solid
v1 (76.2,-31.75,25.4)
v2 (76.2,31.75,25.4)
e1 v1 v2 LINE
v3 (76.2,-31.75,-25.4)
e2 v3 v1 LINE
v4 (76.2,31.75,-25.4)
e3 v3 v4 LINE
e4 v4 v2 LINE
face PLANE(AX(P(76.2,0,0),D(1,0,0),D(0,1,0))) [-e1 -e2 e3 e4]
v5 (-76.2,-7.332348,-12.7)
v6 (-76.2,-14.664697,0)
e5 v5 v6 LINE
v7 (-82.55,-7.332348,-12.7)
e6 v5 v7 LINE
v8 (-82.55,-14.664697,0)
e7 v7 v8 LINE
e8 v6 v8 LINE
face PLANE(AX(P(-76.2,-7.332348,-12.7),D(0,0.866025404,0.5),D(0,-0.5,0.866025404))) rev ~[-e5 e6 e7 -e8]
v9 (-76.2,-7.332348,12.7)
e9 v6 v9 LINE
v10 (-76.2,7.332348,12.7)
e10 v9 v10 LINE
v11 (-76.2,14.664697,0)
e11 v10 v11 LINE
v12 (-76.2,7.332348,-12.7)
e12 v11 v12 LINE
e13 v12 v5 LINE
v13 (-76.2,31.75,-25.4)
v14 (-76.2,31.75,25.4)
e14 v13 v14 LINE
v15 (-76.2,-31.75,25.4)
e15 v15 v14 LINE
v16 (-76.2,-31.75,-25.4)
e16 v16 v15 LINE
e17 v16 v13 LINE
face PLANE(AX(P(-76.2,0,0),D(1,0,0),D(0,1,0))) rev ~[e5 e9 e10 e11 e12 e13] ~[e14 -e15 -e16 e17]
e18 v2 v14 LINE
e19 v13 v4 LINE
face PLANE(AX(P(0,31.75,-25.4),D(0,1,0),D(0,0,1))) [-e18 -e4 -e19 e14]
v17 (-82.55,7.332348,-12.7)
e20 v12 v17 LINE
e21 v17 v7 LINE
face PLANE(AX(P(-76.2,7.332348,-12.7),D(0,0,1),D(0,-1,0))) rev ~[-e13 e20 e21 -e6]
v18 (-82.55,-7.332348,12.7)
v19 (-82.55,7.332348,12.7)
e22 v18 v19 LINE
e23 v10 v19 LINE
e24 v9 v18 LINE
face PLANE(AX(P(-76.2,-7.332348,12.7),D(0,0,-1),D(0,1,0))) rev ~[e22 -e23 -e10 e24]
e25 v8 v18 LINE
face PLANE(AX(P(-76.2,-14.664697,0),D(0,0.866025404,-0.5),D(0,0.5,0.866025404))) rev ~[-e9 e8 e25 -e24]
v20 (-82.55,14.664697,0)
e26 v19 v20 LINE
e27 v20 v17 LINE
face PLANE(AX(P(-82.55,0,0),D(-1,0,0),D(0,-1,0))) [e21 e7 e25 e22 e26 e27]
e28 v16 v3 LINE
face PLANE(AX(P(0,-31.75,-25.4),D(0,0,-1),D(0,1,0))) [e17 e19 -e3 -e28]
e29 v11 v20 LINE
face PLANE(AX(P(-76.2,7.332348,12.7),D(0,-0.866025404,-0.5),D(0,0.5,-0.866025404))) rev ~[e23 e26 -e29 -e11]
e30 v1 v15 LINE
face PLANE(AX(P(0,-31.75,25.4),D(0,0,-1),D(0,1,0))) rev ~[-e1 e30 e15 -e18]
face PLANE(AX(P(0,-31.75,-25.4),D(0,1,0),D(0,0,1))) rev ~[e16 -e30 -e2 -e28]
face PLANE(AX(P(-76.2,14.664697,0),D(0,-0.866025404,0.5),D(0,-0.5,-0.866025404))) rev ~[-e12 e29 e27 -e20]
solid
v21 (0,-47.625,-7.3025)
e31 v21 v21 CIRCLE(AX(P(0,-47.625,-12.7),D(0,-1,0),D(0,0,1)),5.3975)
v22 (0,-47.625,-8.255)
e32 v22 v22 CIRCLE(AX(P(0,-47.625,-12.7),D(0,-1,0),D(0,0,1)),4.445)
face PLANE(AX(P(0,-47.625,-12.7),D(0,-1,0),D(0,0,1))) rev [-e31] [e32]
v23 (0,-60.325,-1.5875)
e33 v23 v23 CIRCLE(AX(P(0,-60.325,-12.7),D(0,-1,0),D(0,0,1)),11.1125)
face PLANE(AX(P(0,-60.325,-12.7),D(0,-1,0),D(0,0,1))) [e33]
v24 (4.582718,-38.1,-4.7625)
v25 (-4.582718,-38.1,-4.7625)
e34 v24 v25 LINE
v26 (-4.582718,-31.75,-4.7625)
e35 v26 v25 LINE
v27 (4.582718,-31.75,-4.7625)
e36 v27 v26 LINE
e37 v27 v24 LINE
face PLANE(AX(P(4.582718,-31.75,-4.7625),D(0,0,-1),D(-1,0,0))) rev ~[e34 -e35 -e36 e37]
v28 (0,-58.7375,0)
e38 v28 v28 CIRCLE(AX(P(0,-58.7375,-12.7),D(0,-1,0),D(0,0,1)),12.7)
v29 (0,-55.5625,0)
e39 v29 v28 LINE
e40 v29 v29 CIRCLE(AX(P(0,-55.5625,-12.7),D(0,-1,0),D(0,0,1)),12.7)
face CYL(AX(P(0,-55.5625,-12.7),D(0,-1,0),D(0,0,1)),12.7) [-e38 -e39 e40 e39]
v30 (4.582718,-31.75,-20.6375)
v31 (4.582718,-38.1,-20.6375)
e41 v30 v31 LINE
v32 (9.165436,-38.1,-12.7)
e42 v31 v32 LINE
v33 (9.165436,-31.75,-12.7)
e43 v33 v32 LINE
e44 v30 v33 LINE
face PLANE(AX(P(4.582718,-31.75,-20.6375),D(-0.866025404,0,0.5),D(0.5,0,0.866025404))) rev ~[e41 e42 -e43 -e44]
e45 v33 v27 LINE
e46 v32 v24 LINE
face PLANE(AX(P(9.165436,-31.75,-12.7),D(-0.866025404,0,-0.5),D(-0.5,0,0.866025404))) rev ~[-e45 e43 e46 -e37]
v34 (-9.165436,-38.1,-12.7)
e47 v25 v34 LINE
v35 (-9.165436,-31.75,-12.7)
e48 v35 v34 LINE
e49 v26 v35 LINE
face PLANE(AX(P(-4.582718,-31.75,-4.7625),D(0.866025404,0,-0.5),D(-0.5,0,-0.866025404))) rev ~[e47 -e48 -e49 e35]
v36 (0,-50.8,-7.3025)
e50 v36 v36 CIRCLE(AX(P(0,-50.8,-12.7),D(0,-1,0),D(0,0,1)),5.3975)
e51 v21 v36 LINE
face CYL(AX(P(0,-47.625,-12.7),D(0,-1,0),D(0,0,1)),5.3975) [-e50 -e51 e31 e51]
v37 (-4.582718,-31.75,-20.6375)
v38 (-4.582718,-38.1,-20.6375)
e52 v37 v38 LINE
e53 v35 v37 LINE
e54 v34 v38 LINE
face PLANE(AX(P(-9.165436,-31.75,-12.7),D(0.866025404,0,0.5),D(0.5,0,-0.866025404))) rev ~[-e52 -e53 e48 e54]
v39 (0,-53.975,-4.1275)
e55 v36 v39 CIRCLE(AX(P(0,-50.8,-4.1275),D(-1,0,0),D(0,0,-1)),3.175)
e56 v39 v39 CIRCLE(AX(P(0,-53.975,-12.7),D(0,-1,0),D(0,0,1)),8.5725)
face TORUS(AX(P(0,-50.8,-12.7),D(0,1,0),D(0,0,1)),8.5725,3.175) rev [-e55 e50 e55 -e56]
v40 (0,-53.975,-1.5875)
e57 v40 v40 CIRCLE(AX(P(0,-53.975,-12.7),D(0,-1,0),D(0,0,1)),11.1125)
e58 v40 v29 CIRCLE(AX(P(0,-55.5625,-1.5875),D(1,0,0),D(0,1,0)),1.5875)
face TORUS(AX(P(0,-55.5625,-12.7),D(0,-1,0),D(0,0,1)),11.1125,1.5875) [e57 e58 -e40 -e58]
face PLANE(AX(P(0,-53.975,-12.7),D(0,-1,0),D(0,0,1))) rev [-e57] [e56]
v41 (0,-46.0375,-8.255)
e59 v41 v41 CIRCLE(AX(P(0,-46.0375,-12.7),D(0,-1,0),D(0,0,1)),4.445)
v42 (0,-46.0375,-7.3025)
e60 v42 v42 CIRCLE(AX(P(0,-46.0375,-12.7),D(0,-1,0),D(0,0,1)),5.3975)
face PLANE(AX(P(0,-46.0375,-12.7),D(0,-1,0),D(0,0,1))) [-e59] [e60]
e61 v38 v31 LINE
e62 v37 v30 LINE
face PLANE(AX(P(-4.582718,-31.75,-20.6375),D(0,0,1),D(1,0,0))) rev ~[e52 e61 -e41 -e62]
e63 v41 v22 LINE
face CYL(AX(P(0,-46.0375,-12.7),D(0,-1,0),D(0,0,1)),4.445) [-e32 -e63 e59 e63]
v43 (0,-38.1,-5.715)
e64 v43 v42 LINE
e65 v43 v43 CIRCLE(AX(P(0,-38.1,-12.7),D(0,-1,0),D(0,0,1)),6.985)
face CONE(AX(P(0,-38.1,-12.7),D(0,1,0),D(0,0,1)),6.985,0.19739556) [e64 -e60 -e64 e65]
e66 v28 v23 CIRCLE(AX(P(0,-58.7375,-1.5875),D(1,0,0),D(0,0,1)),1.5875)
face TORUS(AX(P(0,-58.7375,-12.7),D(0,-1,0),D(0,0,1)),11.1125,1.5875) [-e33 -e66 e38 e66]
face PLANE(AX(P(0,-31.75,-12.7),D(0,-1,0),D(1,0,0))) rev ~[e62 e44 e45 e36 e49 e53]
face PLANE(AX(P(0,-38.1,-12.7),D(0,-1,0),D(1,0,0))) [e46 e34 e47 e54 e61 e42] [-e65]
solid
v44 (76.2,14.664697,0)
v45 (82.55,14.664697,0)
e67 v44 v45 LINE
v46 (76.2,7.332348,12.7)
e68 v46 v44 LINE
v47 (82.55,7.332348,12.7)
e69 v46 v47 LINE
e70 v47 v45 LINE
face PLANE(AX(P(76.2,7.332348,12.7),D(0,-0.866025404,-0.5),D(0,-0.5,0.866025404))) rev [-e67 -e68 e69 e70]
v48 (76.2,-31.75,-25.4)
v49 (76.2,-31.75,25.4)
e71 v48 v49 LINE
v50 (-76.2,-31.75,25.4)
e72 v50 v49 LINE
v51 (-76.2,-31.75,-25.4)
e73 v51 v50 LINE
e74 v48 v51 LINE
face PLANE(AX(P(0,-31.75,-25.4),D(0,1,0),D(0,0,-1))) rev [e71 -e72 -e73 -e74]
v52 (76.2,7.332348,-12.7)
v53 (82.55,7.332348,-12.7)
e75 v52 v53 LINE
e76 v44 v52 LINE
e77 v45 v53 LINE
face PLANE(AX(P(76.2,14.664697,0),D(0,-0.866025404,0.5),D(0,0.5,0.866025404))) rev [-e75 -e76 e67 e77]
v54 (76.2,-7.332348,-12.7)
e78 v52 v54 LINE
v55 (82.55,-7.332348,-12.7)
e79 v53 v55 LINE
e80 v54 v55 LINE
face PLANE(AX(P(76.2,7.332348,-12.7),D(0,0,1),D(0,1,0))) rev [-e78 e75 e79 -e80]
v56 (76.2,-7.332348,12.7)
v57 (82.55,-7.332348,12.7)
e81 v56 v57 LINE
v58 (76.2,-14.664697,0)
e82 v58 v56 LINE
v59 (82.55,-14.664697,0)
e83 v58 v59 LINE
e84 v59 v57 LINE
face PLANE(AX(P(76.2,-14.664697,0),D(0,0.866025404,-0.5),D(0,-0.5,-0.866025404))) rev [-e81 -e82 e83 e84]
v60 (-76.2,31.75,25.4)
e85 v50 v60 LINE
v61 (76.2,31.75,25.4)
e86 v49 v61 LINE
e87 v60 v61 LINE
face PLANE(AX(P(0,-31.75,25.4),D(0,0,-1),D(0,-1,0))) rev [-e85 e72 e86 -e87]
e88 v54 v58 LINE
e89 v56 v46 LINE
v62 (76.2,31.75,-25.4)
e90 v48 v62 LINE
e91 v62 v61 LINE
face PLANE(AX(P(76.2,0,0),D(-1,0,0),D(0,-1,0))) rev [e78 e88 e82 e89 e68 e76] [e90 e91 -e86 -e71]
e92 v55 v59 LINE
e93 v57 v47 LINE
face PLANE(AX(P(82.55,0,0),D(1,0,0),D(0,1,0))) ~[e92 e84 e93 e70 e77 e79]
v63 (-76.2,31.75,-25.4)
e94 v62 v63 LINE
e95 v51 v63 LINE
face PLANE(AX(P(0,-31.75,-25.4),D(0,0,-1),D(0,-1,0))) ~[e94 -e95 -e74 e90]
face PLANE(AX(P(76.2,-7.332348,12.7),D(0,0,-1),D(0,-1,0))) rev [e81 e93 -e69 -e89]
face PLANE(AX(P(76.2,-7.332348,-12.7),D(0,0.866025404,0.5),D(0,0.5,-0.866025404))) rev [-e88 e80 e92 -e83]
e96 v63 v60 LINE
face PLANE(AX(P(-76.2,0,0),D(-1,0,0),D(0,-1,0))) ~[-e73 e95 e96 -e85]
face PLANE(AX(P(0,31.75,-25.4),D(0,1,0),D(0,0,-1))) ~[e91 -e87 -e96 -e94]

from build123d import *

# Parameters (mm, degrees)
F0_W          = 63.5
F0_H          = 50.8
F1_DEPTH      = 76.2
F1_DEPTH_BACK = 76.2
F3_DEPTH      = 6.35
F8_DEPTH      = 6.35


# Not quite as in the source:
# - a feature names something its author has since deleted; it is built from what else it names
# - the program builds the solid bodies; features that only make, move or delete a surface that nothing else refers to are left out


with BuildPart() as f1:
    # F0 (on Right) → F1 (new body, two sides)
    with BuildSketch(Plane.YZ) as f1_sk:
        Rectangle(F0_W, F0_H)
    extrude(amount=F1_DEPTH)
    extrude(f1_sk.sketch, amount=-F1_DEPTH_BACK)

    # F2 (on face) → F3 (join)
    with BuildSketch(Plane(origin=(-76.2, 0, 0), x_dir=(0, -1, 0), z_dir=(-1, 0, 0))):
        Polygon((7.3323484187, 12.7), (-7.3323484187, 12.7), (-14.6646968374, 0), (-7.3323484187, -12.7), (7.3323484187, -12.7), (14.6646968374, 0), align=None)
    extrude(amount=F3_DEPTH)


with BuildPart() as f6_1:
    # F6: instance of F1
    add(f1.part.mirror(Plane.YZ))


with BuildPart() as f8:
    # F7 (on face) → F8 (new body)
    with BuildSketch(Plane.XZ.offset(31.75)):
        Polygon((9.1654355234, -12.7), (4.5827177617, -4.7625), (-4.5827177617, -4.7625), (-9.1654355234, -12.7), (-4.5827177617, -20.6375), (4.5827177617, -20.6375), align=None)
    extrude(amount=F8_DEPTH)

    # F9 (on Right) → F10 (revolve)
    with BuildSketch(Plane.YZ):
        with BuildLine():
            Line((-38.1, -12.7), (-38.1, -5.715))
            Line((-38.1, -5.715), (-46.0375, -7.3025))
            Line((-46.0375, -7.3025), (-46.0375, -8.255))
            Line((-46.0375, -8.255), (-47.625, -8.255))
            Line((-47.625, -8.255), (-47.625, -7.3025))
            Line((-47.625, -7.3025), (-50.8, -7.3025))
            ThreePointArc((-50.8, -7.3025), (-53.0450640303, -6.3725640303), (-53.975, -4.1275))
            Line((-53.975, -4.1275), (-53.975, -1.5875))
            ThreePointArc((-53.975, -1.5875), (-54.4399679849, -0.4649679849), (-55.5625, 0))
            Line((-55.5625, 0), (-58.7375, 0))
            ThreePointArc((-58.7375, 0), (-59.8600320151, -0.4649679849), (-60.325, -1.5875))
            Line((-60.325, -1.5875), (-60.325, -12.7))
            Line((-60.325, -12.7), (-38.1, -12.7))
        make_face()
    revolve(axis=Axis((0, -65.4494816124, -12.7), (0, -1, 0)))


solid = Compound([f1.part, f6_1.part, f8.part])
